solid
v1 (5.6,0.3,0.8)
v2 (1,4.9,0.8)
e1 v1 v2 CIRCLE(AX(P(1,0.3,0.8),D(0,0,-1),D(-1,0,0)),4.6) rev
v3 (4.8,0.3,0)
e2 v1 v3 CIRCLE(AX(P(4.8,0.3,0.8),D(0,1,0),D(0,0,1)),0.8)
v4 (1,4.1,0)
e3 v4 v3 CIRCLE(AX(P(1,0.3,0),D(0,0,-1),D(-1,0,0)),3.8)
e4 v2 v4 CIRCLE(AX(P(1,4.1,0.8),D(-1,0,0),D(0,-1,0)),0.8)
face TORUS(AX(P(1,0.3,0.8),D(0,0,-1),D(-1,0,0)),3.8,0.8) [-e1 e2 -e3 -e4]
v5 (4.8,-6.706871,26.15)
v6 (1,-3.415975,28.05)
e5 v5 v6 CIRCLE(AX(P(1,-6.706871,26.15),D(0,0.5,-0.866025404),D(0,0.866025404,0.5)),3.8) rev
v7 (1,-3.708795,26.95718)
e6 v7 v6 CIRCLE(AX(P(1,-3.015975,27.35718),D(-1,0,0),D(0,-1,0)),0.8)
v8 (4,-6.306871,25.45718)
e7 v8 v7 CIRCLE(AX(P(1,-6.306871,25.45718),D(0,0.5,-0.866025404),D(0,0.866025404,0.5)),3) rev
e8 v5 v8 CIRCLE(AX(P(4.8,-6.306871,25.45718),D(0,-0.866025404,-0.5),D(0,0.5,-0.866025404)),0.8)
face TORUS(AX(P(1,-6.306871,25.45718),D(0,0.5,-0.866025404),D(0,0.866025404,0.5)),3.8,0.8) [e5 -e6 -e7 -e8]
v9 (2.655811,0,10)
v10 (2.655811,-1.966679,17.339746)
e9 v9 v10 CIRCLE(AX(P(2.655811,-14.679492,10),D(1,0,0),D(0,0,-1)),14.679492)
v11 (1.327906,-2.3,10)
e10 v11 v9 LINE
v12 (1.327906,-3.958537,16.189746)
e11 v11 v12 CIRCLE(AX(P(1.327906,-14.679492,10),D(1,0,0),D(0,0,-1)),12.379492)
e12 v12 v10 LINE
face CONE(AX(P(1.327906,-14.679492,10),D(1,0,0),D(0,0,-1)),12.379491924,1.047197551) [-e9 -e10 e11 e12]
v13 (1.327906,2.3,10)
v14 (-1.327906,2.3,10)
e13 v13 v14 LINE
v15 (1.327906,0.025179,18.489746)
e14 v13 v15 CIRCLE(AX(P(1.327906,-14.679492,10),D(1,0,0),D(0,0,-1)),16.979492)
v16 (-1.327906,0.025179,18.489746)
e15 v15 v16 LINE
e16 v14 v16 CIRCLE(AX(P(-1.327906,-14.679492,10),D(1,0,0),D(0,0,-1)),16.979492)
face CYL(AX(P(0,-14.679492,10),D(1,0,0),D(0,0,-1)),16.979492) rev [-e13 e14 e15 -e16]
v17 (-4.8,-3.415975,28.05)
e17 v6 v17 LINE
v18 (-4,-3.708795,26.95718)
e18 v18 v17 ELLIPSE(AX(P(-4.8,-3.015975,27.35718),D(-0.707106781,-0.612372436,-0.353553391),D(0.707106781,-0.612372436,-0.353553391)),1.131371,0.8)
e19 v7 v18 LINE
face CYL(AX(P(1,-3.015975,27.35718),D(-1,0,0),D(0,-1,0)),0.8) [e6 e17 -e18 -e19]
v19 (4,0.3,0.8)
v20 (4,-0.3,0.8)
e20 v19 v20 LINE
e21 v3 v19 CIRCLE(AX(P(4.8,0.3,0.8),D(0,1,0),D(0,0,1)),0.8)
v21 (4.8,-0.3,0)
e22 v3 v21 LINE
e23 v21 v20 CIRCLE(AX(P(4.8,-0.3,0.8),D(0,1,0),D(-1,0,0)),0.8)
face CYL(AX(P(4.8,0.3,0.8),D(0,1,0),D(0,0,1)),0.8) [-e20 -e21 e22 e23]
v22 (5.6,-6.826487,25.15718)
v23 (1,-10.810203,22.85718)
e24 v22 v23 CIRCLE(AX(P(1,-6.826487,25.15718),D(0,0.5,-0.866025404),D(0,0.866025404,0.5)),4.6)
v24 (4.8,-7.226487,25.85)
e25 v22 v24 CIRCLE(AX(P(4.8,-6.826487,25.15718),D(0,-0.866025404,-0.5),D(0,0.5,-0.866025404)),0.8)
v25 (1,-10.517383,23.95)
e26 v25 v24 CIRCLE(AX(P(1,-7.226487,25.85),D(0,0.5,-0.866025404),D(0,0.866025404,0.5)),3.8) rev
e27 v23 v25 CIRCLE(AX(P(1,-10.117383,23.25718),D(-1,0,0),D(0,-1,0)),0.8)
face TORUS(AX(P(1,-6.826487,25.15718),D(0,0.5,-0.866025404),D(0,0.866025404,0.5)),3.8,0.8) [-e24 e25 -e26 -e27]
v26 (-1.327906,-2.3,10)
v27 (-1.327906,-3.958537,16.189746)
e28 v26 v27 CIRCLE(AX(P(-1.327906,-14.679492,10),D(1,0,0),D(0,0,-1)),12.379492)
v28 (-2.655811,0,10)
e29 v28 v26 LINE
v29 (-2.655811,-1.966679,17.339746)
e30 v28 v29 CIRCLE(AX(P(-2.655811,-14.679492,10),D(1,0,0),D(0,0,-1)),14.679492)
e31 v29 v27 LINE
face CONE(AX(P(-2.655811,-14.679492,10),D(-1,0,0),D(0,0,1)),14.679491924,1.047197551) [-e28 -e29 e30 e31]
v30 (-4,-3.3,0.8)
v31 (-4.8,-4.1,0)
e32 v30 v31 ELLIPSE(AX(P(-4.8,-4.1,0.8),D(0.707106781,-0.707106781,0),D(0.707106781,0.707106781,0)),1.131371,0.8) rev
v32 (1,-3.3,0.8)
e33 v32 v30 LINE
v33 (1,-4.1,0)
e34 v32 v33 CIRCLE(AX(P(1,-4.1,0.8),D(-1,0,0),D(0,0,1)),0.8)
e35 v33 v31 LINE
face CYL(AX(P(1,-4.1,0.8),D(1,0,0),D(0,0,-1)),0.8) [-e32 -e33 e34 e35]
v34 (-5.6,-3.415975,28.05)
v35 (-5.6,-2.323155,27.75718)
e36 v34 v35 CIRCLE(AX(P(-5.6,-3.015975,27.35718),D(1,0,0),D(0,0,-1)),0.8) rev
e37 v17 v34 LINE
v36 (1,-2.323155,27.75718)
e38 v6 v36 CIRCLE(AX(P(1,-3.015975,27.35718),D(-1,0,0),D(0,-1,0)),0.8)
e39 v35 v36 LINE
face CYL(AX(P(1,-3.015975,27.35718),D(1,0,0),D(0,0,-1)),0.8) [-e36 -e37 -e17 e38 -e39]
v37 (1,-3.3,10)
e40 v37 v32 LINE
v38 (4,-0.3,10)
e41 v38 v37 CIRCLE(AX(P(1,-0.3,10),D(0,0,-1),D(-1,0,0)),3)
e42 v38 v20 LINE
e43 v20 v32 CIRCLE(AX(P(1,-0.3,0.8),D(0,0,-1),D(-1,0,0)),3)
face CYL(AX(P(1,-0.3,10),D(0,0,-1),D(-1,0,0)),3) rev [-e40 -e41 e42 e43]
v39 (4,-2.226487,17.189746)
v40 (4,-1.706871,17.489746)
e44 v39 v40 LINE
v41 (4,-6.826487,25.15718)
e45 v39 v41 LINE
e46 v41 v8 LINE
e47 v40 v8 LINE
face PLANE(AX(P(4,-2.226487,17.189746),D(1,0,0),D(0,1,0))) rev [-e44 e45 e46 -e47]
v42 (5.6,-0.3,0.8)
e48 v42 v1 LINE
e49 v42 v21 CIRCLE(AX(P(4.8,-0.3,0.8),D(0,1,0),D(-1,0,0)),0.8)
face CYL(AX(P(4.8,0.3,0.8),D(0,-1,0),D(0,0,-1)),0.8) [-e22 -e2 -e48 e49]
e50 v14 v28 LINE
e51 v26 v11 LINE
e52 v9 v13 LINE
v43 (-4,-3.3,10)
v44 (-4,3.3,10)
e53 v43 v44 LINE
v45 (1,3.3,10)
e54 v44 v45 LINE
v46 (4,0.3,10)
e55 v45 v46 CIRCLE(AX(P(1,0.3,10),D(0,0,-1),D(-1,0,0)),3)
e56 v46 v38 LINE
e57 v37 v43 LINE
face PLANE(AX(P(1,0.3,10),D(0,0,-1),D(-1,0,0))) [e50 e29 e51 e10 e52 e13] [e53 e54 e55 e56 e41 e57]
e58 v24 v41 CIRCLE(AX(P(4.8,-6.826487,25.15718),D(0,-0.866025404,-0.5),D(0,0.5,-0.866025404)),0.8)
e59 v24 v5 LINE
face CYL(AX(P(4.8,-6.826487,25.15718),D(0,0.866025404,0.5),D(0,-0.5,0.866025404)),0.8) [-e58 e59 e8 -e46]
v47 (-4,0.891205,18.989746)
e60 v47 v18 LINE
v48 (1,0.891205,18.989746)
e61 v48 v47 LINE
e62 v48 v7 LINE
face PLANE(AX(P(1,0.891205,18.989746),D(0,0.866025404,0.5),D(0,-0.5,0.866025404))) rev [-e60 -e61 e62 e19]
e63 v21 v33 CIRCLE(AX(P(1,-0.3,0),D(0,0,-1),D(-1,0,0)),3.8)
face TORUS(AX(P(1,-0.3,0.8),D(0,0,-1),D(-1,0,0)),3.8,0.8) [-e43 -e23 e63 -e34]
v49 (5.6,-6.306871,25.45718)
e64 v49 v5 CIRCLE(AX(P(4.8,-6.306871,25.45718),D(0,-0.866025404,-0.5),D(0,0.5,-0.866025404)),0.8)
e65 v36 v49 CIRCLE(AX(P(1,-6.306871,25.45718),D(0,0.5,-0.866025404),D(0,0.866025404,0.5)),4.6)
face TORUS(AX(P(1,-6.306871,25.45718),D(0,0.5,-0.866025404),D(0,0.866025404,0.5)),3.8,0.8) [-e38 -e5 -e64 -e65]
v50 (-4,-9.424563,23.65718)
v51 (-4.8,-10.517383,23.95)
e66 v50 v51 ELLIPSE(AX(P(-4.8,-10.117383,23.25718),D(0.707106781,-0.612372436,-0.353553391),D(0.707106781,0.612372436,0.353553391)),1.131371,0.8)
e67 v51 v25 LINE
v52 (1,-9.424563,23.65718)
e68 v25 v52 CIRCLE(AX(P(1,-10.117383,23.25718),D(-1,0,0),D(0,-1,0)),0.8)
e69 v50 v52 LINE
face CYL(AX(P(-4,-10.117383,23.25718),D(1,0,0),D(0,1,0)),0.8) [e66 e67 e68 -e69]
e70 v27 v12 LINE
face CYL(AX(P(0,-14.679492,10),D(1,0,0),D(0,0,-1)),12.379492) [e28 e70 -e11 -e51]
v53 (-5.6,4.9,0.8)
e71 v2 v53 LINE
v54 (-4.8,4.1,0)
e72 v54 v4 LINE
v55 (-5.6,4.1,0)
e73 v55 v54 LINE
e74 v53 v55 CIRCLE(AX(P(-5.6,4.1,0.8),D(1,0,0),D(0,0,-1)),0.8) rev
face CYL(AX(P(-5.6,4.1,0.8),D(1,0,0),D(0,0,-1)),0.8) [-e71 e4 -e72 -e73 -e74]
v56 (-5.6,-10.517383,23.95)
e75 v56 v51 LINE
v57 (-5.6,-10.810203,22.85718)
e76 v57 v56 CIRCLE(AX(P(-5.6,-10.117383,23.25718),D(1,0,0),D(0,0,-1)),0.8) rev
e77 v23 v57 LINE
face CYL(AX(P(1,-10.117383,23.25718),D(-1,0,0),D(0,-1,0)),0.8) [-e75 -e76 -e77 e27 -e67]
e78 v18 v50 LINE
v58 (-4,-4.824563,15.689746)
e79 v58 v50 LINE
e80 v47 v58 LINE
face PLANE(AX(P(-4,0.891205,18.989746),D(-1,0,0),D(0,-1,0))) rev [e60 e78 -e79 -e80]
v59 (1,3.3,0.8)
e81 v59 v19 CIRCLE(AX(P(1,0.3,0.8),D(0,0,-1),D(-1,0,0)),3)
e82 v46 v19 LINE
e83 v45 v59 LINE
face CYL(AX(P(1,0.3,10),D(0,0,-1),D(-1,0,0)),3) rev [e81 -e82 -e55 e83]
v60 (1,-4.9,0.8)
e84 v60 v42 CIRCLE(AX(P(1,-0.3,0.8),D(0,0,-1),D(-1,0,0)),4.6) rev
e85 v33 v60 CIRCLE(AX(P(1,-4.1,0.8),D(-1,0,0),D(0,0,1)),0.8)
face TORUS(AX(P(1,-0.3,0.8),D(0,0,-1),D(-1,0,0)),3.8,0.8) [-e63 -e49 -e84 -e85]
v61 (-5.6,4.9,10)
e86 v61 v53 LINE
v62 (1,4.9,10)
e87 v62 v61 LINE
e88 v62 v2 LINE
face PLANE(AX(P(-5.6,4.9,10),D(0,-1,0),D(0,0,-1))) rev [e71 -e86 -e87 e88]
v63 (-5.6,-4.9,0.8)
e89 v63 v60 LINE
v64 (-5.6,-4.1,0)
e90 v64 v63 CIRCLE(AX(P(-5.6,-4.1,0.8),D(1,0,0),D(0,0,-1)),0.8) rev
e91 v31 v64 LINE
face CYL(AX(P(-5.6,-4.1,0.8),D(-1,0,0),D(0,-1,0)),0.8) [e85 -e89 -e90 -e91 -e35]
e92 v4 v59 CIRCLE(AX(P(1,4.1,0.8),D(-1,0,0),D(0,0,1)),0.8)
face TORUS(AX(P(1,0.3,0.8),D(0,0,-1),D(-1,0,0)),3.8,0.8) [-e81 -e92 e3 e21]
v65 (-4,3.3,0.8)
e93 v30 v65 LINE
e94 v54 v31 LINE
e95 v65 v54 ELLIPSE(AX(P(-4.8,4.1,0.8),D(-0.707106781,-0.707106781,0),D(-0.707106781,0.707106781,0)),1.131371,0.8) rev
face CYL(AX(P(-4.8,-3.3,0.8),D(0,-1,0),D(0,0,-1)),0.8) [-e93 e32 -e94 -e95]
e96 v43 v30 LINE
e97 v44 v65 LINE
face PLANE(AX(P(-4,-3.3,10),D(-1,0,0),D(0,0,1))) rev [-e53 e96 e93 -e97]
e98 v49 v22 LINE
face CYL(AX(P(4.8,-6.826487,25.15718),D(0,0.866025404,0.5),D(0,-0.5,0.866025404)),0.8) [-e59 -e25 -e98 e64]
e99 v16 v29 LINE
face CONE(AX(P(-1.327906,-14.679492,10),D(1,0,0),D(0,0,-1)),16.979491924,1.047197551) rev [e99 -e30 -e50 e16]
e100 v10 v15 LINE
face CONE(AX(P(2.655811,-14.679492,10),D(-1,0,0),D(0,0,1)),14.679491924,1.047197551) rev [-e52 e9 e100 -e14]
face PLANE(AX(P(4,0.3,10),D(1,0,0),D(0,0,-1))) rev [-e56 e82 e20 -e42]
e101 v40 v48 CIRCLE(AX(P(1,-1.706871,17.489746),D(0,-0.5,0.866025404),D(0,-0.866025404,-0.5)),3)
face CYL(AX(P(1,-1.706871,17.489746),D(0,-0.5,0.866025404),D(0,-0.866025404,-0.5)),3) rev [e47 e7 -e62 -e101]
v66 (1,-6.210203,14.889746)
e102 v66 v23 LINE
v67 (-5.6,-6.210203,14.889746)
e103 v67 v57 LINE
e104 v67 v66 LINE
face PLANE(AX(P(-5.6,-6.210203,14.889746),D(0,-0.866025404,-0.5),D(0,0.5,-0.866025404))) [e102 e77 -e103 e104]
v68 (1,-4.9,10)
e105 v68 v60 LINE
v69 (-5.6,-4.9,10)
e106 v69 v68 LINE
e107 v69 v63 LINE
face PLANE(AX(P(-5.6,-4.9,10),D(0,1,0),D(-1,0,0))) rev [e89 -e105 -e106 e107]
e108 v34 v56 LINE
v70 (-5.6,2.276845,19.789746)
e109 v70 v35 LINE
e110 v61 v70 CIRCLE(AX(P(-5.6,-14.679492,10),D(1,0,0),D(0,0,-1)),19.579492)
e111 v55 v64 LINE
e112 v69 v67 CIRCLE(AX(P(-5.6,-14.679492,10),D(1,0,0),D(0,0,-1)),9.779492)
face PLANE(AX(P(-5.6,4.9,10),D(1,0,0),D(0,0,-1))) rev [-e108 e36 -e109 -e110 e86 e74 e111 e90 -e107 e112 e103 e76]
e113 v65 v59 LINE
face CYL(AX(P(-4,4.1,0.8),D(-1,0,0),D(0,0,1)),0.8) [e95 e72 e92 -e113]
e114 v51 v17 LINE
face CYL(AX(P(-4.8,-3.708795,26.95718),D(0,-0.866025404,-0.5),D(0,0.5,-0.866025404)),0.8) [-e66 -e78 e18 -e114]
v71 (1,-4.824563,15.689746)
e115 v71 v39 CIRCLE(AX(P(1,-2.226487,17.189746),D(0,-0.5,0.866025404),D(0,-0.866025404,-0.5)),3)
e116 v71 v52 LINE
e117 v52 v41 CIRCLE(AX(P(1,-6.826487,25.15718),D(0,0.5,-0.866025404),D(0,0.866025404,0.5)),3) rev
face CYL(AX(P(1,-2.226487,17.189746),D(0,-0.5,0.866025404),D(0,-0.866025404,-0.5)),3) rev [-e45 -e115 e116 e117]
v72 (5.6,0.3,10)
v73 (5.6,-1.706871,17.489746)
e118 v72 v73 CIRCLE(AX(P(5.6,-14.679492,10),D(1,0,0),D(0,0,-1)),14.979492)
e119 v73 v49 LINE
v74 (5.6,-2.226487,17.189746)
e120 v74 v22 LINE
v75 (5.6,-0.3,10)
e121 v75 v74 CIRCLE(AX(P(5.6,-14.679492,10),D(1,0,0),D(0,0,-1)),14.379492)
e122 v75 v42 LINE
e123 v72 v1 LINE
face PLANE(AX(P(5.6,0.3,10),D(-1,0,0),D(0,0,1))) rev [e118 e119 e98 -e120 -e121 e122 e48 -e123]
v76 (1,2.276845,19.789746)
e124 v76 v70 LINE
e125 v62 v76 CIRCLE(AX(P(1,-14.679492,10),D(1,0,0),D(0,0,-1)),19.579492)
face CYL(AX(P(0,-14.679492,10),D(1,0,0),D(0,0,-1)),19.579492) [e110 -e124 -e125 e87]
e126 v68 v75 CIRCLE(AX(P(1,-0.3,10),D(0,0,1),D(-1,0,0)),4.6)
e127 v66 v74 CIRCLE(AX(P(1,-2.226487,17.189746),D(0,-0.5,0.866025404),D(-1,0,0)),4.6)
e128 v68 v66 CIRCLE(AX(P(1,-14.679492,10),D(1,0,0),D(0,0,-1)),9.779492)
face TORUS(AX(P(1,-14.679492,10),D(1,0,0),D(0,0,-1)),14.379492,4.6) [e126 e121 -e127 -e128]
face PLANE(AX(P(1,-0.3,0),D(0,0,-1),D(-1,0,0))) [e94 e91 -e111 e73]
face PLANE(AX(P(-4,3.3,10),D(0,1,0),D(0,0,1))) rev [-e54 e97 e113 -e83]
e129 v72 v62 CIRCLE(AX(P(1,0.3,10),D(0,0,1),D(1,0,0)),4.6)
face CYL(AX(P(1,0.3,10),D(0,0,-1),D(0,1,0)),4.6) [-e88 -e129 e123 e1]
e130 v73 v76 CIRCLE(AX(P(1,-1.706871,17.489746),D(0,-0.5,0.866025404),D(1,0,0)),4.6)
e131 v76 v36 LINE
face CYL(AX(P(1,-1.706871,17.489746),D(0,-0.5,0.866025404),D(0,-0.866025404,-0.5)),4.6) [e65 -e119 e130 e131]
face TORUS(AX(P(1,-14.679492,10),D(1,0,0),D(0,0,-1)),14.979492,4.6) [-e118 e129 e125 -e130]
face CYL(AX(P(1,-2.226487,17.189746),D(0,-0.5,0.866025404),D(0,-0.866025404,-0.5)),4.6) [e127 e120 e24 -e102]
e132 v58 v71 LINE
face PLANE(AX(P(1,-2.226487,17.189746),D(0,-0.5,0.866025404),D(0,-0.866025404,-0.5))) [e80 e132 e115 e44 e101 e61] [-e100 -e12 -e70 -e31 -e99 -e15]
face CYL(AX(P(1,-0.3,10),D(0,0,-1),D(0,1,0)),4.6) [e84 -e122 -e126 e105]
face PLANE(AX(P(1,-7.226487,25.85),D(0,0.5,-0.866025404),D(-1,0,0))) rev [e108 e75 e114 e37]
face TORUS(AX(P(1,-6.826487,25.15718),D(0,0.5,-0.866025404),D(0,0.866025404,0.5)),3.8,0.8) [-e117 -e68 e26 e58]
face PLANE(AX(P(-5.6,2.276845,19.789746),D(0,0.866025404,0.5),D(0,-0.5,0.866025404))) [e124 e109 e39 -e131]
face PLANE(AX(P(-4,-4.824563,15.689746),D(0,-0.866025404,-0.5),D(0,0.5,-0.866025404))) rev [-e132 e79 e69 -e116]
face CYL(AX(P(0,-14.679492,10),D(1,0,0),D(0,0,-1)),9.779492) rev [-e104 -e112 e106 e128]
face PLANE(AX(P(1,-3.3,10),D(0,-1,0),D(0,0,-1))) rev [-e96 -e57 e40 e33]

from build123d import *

# Parameters (mm, degrees)
CUT_EXTRUDE1_DEPTH = 10
CUT_EXTRUDE2_DEPTH = 10
FILLET1_R          = 0.8


with BuildPart() as part:
    # Sweep1: sweep along a path in Sketch2
    with BuildLine(Plane(origin=(0, 0, 0), x_dir=(0, 0, -1), z_dir=(1, 0, 0))) as sweep1_path:
        Line((0, 0), (-10, 0))
        ThreePointArc((-10, 0), (-13.799332082, -0.500191558), (-17.339745962, -1.966679003))
        Line((-17.339745962, -1.966679003), (-26, -6.966679003))
    # Sketch1 → Sweep1 (sweep)
    with BuildSketch(Plane.XY):
        with BuildLine():
            Line((-5.6, 4.9), (1, 4.9))
            ThreePointArc((1, 4.9), (4.252691193, 3.552691193), (5.6, 0.3))
            Line((5.6, 0.3), (5.6, -0.3))
            ThreePointArc((5.6, -0.3), (4.252691193, -3.552691193), (1, -4.9))
            Line((1, -4.9), (-5.6, -4.9))
            Line((-5.6, -4.9), (-5.6, 4.9))
        make_face()
        Polygon((2.655811238, 0), (1.327905619, 2.3), (-1.327905619, 2.3), (-2.655811238, 0), (-1.327905619, -2.3), (1.327905619, -2.3), align=None, mode=Mode.SUBTRACT)
    sweep(path=sweep1_path.line)

    # Sketch3 → Cut-Extrude1 (cut)
    with BuildSketch(Plane(origin=(0, 0, 0), x_dir=(-1, 0, 0), z_dir=(0, 0, -1))):
        with BuildLine():
            Line((4, -3.3), (4, 3.3))
            Line((4, 3.3), (-1, 3.3))
            ThreePointArc((-1, 3.3), (-3.121320344, 2.421320344), (-4, 0.3))
            Line((-4, 0.3), (-4, -0.3))
            ThreePointArc((-4, -0.3), (-3.121320344, -2.421320344), (-1, -3.3))
            Line((-1, -3.3), (4, -3.3))
        make_face()
    extrude(amount=-CUT_EXTRUDE1_DEPTH, mode=Mode.SUBTRACT)

    # Sketch4 → Cut-Extrude2 (cut)
    with BuildSketch(Plane(origin=(0, -13, 22.516660498), x_dir=(1, 0, 0), z_dir=(0, -0.5000000000000009, 0.8660254037844382))):
        with BuildLine():
            Line((-4, 10.266679003), (-4, 3.666679003))
            Line((-4, 3.666679003), (1, 3.666679003))
            ThreePointArc((1, 3.666679003), (3.121320344, 4.54535866), (4, 6.666679003))
            Line((4, 6.666679003), (4, 7.266679003))
            ThreePointArc((4, 7.266679003), (3.121320344, 9.387999347), (1, 10.266679003))
            Line((1, 10.266679003), (-4, 10.266679003))
        make_face()
    extrude(amount=-CUT_EXTRUDE2_DEPTH, mode=Mode.SUBTRACT)

    # Fillet1
    fillet1_edges = [part.edges().sort_by_distance(p)[0] for p in [
        (-1.5, -4.108795171, 27.65),
        (-4, -6.966679003, 26),
        (-1.5, -9.824562836, 24.35),
        (3.121320344, -9.063603931, 24.789339828),
        (4, -6.966679003, 26),
        (3.121320344, -4.869754075, 27.210660172),
        (-2.3, 4.9, 0),
        (4.252691193, 3.552691193, 0),
        (5.6, 0, 0),
        (4.252691193, -3.552691193, 0),
        (-2.3, -4.9, 0),
        (-2.3, -2.723154525, 28.45),
        (4.252691193, -3.889958178, 27.776345597),
        (5.6, -6.966679003, 26),
        (4.252691193, -10.043399829, 24.223654403),
        (-2.3, -11.210203482, 23.55),
        (-1.5, -3.3, 0),
        (-4, 0, 0),
        (-1.5, 3.3, 0),
        (3.121320344, 2.421320344, 0),
        (4, 0, 0),
        (3.121320344, -2.421320344, 0),
    ]]
    fillet(fillet1_edges, radius=FILLET1_R - 0.0001)  # a hair under: the kernel refuses the full size


solid = part.part
